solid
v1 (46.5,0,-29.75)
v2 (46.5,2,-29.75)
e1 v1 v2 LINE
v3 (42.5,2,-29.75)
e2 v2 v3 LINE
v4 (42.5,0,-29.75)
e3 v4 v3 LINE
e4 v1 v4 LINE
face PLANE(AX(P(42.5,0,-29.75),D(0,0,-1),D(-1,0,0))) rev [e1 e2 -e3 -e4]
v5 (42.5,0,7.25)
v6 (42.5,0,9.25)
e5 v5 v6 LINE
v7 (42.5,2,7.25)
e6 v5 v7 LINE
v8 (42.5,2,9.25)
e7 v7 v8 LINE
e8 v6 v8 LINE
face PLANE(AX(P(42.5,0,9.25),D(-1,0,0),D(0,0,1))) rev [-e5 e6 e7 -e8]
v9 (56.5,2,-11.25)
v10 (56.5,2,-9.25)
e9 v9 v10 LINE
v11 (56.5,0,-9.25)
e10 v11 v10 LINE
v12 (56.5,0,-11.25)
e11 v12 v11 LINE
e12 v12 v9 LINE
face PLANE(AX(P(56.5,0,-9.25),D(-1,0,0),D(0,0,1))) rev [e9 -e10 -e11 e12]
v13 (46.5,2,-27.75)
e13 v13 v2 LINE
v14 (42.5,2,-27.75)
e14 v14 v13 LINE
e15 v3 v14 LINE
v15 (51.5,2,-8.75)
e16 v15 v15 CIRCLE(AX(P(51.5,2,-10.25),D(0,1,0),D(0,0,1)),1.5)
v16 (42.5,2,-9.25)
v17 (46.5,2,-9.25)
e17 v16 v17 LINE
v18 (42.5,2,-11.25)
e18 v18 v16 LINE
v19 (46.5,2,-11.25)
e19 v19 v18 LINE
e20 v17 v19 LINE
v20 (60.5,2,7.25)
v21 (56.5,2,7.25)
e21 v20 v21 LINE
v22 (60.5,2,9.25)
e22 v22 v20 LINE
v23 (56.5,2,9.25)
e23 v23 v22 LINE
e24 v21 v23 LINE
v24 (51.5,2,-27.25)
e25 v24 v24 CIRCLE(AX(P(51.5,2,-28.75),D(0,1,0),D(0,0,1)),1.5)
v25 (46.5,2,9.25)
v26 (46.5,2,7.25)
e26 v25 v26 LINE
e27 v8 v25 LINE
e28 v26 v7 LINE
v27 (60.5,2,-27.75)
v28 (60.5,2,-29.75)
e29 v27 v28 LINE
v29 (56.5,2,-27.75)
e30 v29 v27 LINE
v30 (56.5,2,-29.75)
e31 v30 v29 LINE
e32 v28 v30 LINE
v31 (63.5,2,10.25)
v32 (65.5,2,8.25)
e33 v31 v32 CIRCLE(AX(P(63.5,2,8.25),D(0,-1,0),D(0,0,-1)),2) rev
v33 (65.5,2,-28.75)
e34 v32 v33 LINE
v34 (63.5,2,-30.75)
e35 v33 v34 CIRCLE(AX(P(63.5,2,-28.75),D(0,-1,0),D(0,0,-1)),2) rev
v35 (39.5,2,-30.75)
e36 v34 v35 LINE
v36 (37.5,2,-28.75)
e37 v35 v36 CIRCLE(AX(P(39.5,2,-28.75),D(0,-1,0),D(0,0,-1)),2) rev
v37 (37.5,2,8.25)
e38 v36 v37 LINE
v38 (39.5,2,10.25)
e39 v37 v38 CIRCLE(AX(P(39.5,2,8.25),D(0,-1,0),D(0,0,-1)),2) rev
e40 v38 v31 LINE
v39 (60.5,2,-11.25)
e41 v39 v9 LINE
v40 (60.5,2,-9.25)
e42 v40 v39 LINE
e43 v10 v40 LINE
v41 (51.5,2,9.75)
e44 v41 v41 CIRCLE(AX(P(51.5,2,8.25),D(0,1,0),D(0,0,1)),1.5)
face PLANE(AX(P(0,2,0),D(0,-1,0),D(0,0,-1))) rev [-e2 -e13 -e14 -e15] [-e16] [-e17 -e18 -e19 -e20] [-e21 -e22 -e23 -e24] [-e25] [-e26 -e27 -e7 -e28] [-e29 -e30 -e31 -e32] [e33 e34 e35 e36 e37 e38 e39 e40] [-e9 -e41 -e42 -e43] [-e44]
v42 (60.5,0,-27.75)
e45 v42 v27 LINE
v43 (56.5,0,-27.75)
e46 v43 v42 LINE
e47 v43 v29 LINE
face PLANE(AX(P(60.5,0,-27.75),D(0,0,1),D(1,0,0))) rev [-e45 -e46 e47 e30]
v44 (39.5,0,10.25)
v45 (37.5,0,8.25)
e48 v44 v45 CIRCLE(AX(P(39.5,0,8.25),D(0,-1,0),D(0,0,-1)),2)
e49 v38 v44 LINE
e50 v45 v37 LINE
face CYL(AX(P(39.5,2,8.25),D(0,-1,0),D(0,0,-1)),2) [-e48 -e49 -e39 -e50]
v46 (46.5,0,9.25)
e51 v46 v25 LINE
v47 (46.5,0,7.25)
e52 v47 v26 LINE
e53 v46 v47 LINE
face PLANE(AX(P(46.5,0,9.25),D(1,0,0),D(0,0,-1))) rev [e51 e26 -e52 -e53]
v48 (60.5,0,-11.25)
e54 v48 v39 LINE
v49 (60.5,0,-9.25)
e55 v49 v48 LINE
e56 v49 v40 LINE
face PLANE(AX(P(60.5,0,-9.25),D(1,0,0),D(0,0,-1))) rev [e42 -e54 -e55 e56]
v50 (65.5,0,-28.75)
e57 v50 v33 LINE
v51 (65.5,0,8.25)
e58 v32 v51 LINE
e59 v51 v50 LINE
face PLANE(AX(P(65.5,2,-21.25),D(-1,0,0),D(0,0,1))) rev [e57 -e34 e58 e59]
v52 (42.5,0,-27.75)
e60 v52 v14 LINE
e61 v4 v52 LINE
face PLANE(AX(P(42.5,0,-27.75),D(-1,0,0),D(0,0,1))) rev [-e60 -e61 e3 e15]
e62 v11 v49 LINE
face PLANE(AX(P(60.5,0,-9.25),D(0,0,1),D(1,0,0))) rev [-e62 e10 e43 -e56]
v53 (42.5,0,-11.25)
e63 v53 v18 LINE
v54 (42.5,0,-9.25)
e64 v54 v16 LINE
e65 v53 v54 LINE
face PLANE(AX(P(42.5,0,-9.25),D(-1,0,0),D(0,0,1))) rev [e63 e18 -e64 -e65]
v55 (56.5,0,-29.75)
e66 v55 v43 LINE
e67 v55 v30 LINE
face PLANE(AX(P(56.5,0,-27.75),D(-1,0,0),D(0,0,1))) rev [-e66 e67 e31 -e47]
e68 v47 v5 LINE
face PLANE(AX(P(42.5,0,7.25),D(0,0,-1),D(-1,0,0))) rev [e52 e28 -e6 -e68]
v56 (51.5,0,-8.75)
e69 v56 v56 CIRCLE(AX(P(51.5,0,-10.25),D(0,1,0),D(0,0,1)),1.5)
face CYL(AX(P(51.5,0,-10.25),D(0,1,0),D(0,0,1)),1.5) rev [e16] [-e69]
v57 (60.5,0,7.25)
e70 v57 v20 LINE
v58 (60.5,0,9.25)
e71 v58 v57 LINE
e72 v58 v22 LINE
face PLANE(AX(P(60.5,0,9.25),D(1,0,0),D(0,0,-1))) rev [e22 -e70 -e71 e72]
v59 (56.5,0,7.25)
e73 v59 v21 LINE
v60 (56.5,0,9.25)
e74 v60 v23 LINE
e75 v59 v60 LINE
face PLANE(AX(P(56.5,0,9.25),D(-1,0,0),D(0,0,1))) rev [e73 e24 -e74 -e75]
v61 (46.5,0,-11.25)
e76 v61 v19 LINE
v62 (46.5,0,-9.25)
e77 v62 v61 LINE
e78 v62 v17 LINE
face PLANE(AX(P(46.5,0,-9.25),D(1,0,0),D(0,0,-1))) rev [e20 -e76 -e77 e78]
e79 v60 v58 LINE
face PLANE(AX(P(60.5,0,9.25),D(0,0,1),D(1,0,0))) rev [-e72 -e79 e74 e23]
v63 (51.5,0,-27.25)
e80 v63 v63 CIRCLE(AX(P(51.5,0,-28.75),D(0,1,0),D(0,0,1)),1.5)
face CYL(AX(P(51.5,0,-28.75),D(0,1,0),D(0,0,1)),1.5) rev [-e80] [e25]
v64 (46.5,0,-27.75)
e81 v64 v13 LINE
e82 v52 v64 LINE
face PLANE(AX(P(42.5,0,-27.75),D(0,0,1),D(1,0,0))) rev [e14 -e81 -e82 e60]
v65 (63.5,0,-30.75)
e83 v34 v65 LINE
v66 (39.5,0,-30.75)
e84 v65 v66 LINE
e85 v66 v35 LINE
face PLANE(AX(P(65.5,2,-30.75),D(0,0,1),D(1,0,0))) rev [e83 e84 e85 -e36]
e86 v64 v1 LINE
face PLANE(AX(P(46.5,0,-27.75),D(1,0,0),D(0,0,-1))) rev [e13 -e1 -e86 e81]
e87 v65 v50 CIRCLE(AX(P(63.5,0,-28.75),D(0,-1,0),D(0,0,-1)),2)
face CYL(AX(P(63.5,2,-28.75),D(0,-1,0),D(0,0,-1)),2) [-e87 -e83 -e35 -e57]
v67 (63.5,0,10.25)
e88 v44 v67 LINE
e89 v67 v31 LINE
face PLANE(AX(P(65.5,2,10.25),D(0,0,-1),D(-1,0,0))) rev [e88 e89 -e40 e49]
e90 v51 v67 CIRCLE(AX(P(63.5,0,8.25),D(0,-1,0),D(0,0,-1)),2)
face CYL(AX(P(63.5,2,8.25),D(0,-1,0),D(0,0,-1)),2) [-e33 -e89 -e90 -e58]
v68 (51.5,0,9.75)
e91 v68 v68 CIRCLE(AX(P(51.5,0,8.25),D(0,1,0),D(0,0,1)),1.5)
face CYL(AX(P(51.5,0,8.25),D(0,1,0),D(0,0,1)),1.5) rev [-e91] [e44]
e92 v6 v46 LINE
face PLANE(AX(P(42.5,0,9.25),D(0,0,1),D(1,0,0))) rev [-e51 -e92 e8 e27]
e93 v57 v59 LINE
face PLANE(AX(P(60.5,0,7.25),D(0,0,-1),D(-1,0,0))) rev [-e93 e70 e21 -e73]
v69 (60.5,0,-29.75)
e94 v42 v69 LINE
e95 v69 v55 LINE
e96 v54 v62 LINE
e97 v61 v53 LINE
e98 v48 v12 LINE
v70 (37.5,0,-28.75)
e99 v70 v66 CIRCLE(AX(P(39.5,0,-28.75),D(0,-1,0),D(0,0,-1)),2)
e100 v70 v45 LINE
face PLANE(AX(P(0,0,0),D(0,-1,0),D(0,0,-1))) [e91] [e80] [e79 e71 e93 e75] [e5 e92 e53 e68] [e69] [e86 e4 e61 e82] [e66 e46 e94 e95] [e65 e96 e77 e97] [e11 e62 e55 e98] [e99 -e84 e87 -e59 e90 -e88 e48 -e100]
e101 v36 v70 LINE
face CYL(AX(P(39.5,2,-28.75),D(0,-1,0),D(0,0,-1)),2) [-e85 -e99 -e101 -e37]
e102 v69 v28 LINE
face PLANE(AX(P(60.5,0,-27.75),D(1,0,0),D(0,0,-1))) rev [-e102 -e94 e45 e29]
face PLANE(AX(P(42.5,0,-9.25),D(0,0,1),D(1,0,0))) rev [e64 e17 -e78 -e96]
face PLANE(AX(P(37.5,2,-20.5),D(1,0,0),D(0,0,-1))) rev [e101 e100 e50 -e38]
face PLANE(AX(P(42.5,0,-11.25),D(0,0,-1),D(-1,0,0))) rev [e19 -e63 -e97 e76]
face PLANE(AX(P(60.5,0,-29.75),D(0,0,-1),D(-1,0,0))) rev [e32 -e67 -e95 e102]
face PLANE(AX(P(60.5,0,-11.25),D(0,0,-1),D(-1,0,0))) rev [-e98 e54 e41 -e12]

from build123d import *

# Parameters (mm, degrees)
SKETCH1_R           = 2.25
BOSS_EXTRUDE1_DEPTH = 2
FILLET1_R           = 10.25
FILLET2_R           = 2
SKETCH2_R           = 1.5
SKETCH2_W           = 4
SKETCH2_H           = 2
CUT_EXTRUDE1_DEPTH  = 2
FILLET3_R           = 8
SKETCH3_W           = 40.842978794
SKETCH3_H           = 39.737994682
CUT_EXTRUDE2_DEPTH  = 2


with BuildPart() as part:
    # Sketch1 → Boss-Extrude1 (new body)
    with BuildSketch(Plane(origin=(0, 0, 0), x_dir=(1, 0, 0), z_dir=(0, 1, 0))):
        Polygon((0, 0), (37.5, 0), (37.5, -10.25), (65.5, -10.25), (65.5, -0.75), (65.5, 21.25), (65.5, 30.75), (37.5, 30.75), (37.5, 20.5), (0, 20.5), align=None)
        with Locations(Location((10.25, 10.25, 0), (0, 0, 270))):
            Circle(SKETCH1_R, mode=Mode.SUBTRACT)
    extrude(amount=BOSS_EXTRUDE1_DEPTH)

    # Fillet1
    fillet1_edges = [part.edges().sort_by_distance(p)[0] for p in [
        (0, 1, -20.5),
        (0, 1, 0),
    ]]
    fillet(fillet1_edges, radius=FILLET1_R - 0.0001)  # a hair under: the kernel refuses the full size

    # Fillet2
    fillet2_edges = [part.edges().sort_by_distance(p)[0] for p in [
        (37.5, 1, -30.75),
        (65.5, 1, -30.75),
        (65.5, 1, 10.25),
        (37.5, 1, 10.25),
    ]]
    fillet(fillet2_edges, radius=FILLET2_R)

    # Sketch2 → Cut-Extrude1 (cut)
    with BuildSketch(Plane(origin=(0, 2, 0), x_dir=(1, 0, 0), z_dir=(0, 1, 0))):
        with Locations(Location((51.5, 28.75, 0), (0, 0, 270))):
            Circle(SKETCH2_R)
        with Locations(Location((51.5, 10.25, 0), (0, 0, 270))):
            Circle(SKETCH2_R)
        with Locations(Location((51.5, -8.25, 0), (0, 0, 270))):
            Circle(SKETCH2_R)
        with Locations((44.5, 28.75)):
            Rectangle(SKETCH2_W, SKETCH2_H)
        with Locations((58.5, 28.75)):
            Rectangle(SKETCH2_W, SKETCH2_H)
        with Locations((44.5, 10.25)):
            Rectangle(SKETCH2_W, SKETCH2_H)
        with Locations((58.5, 10.25)):
            Rectangle(SKETCH2_W, SKETCH2_H)
        with Locations((44.5, -8.25)):
            Rectangle(SKETCH2_W, SKETCH2_H)
        with Locations((58.5, -8.25)):
            Rectangle(SKETCH2_W, SKETCH2_H)
    extrude(amount=-CUT_EXTRUDE1_DEPTH, mode=Mode.SUBTRACT)

    # Fillet3
    fillet3_edges = [part.edges().sort_by_distance(p)[0] for p in [
        (37.5, 1, -20.5),
        (37.5, 1, 0),
    ]]
    fillet(fillet3_edges, radius=FILLET3_R)

    # Sketch3 → Cut-Extrude2 (cut)
    with BuildSketch(Plane(origin=(0, 2, 0), x_dir=(1, 0, 0), z_dir=(0, 1, 0))):
        with Locations((17.078510603, 8.881002659)):
            Rectangle(SKETCH3_W, SKETCH3_H)
    extrude(amount=-CUT_EXTRUDE2_DEPTH, mode=Mode.SUBTRACT)


solid = part.part
